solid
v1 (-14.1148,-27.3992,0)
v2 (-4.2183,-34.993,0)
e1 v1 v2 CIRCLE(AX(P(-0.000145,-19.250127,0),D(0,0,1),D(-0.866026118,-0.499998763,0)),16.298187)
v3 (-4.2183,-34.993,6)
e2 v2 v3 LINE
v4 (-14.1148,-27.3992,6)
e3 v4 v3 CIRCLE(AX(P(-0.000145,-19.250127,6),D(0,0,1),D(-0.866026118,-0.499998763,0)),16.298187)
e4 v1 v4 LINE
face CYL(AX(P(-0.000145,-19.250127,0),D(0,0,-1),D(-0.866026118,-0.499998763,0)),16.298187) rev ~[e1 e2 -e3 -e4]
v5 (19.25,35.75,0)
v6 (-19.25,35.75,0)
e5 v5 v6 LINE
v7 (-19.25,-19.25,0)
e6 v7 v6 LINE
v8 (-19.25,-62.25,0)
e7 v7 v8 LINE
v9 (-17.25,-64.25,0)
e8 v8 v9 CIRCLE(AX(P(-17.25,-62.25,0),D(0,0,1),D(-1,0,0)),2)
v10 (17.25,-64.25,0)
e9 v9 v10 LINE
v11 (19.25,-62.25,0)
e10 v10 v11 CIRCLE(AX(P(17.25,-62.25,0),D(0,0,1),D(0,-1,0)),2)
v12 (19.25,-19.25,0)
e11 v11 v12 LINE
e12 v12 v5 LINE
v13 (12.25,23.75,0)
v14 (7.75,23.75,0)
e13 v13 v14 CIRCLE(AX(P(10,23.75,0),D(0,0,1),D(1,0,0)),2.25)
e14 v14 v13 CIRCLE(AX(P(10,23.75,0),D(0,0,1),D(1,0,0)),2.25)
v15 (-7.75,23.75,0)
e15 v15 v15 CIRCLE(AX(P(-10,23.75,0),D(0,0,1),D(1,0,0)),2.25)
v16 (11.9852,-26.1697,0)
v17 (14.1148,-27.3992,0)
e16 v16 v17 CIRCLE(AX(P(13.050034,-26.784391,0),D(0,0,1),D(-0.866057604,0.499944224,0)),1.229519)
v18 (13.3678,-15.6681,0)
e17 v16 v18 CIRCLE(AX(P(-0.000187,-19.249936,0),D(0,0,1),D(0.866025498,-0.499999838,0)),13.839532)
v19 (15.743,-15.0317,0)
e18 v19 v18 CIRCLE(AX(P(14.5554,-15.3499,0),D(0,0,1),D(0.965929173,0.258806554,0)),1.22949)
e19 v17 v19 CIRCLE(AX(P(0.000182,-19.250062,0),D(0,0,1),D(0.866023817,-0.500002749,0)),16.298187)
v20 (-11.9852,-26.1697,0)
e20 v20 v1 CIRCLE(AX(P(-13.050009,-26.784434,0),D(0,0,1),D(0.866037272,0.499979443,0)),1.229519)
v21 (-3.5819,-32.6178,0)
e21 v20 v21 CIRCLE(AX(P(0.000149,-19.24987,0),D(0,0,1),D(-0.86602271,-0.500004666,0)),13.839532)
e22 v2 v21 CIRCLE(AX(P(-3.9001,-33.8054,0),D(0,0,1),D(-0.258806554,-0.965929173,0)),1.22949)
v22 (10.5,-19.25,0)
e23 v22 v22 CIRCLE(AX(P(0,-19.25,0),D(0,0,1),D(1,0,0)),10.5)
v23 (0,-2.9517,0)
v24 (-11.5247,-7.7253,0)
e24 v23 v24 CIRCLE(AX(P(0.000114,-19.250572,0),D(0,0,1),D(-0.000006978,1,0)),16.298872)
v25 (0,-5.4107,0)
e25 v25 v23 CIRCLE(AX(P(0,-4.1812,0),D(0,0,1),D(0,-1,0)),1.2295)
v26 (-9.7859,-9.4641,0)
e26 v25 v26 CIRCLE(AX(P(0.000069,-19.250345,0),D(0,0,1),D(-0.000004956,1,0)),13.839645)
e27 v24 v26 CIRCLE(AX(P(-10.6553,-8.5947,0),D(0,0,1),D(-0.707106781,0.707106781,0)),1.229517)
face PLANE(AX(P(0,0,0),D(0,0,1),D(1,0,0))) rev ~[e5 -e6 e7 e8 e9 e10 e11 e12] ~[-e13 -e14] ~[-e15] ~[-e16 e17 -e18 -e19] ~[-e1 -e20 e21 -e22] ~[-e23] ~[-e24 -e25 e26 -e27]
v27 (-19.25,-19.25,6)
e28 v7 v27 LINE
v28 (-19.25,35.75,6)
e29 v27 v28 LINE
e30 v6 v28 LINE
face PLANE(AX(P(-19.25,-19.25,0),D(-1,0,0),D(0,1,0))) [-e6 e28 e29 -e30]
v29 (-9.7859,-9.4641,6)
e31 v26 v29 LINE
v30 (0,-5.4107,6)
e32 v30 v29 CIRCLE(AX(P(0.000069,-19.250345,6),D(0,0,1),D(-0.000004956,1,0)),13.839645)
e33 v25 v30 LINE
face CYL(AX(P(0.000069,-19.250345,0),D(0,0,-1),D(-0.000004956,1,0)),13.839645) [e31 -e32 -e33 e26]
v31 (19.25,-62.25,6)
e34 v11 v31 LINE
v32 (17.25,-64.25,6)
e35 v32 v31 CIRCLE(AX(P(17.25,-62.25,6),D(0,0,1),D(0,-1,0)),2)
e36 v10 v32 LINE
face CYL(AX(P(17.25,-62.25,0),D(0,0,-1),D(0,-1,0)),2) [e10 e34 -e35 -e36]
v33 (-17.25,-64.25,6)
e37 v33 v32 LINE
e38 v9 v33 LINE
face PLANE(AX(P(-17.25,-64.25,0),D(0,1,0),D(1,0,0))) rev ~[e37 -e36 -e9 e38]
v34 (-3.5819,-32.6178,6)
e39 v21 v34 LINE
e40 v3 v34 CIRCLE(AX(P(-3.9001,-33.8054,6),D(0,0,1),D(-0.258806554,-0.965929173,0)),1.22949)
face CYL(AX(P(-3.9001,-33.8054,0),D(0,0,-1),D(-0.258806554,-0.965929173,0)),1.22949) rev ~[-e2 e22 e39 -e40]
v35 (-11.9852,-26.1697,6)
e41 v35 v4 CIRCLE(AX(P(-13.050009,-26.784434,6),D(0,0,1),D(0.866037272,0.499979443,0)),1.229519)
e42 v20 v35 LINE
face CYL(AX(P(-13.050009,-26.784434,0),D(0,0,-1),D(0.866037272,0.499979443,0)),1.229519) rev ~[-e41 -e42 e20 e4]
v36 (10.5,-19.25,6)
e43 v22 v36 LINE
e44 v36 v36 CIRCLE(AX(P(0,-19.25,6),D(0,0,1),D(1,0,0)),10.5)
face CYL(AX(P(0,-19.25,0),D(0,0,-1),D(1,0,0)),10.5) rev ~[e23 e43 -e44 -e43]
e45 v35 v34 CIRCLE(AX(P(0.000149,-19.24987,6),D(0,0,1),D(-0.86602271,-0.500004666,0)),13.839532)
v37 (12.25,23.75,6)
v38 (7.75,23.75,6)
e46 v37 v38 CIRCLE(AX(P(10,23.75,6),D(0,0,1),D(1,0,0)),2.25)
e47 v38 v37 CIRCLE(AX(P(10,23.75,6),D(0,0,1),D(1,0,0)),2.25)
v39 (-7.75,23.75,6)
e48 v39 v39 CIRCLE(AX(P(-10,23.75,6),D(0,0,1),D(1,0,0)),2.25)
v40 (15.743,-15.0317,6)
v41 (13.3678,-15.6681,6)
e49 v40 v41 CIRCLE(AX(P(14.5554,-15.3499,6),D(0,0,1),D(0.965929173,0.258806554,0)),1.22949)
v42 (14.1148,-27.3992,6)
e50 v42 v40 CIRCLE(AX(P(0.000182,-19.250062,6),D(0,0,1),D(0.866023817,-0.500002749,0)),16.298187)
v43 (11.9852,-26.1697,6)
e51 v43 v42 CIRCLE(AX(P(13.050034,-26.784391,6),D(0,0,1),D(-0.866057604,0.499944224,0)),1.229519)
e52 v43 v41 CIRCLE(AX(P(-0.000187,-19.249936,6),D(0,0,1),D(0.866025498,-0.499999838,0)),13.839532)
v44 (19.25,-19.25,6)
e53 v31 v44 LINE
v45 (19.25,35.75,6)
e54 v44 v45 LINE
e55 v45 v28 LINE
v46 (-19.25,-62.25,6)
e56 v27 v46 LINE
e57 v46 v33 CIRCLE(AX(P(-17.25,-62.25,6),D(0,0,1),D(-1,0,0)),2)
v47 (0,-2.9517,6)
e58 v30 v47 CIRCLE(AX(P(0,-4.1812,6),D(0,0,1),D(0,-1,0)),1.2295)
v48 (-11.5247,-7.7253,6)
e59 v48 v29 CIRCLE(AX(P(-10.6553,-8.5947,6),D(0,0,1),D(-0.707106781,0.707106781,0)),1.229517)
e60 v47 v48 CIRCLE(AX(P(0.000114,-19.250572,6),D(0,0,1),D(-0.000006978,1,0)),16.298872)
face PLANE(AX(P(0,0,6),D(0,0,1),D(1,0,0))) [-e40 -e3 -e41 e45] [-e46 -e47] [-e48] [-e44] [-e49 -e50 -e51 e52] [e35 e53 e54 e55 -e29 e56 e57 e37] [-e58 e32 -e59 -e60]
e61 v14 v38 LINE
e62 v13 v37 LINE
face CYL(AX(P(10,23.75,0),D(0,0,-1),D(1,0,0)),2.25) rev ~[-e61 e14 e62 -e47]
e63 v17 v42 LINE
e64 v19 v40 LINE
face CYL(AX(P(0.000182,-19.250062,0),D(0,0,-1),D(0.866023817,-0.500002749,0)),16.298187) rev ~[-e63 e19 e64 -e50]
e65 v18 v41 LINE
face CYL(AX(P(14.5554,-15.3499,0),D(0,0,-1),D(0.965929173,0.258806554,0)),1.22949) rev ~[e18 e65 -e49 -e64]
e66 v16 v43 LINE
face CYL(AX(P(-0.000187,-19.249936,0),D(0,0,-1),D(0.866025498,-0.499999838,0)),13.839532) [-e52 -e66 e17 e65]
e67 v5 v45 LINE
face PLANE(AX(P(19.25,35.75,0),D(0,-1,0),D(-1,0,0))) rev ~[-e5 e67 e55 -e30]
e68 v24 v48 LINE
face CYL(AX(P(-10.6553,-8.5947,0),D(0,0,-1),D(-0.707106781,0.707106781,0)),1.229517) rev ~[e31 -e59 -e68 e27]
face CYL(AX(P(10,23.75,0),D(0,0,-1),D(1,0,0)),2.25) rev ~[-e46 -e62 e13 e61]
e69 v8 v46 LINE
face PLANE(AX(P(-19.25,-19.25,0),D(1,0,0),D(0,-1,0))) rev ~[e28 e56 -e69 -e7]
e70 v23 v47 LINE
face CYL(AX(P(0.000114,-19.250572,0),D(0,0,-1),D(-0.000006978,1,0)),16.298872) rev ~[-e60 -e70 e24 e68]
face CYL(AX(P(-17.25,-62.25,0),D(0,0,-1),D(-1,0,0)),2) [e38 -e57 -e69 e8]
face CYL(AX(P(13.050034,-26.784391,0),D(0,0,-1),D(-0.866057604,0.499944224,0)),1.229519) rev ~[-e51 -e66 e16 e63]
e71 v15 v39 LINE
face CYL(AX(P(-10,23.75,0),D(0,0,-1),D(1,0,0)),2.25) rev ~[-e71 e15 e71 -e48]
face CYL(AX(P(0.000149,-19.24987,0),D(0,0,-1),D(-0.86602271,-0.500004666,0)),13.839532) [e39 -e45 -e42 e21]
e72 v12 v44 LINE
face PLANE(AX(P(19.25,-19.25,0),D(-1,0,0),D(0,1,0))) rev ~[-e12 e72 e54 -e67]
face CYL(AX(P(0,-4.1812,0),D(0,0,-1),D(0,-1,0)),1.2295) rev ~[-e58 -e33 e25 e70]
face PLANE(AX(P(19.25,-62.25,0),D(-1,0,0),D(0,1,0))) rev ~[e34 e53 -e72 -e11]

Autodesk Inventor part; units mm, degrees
ref_plane "YZ Plane" through (0, 0, 0) normal (1, 0, 0) x (0, 1, 0)
ref_plane "XZ Plane" through (0, 0, 0) normal (0, 1, 0) x (-1, 0, 0)
ref_plane "XY Plane" through (0, 0, 0) normal (0, 0, 1) x (1, 0, 0)
sketch "Sketch1" plane through (0, 0, 0) normal (0, 0, 1) x (1, 0, 0)
  circle A0 centre (0, -19.25) radius 10.5
  arc A1 (11.9852, -26.1697) -> (14.1148, -27.3992) centre (13.05, -26.7844) ccw
  arc A2 (-11.9852, -26.1697) -> (-14.1148, -27.3992) centre (-13.05, -26.7844) ccw
  arc A3 (0, -5.4107) -> (0, -2.9517) centre (0, -4.1812) ccw
  line L0 (0, -19.25) -> (14.5554, -15.3499) construction
  line L1 (0, -19.25) -> (13.05, -26.7844) construction
  line L2 (0, -19.25) -> (-10.6553, -8.5947) construction
  line L3 (0, -19.25) -> (0, -4.1812) construction
  line L4 (0, -19.25) -> (-3.9001, -33.8054) construction
  line L5 (0, -19.25) -> (-13.05, -26.7844) construction
  arc A4 (-4.2183, -34.993) -> (-3.5819, -32.6178) centre (-3.9001, -33.8054) ccw
  arc A5 (15.743, -15.0317) -> (13.3678, -15.6681) centre (14.5554, -15.3499) ccw
  arc A6 (-11.5247, -7.7253) -> (-9.7859, -9.4641) centre (-10.6553, -8.5947) ccw
  arc A7 (0, -2.9517) -> (-11.5247, -7.7253) centre (0, -19.25) ccw
  arc A8 (0, -5.4107) -> (-9.7859, -9.4641) centre (0, -19.25) ccw
  arc A9 (11.9852, -26.1697) -> (13.3678, -15.6681) centre (0, -19.25) ccw
  arc A10 (14.1148, -27.3992) -> (15.743, -15.0317) centre (0, -19.25) ccw
  arc A11 (-11.9852, -26.1697) -> (-3.5819, -32.6178) centre (0, -19.25) ccw
  arc A12 (-14.1148, -27.3992) -> (-4.2183, -34.993) centre (0, -19.25) ccw
  line L6 (19.25, -19.25) -> (19.25, 35.75)
  line L7 (-19.25, -19.25) -> (-19.25, 35.75)
  line L8 (19.25, 35.75) -> (-19.25, 35.75)
  circle A13 centre (-10, 23.75) radius 2.25
  circle A14 centre (10, 23.75) radius 2.25
  line L9 (10, 23.75) -> (-10, 23.75)
  line L10 (-19.25, -19.25) -> (-19.25, -62.25)
  line L11 (-17.25, -64.25) -> (17.25, -64.25)
  line L12 (19.25, -62.25) -> (19.25, -19.25)
  arc A15 (-19.25, -62.25) -> (-17.25, -64.25) centre (-17.25, -62.25) ccw
  arc A16 (17.25, -64.25) -> (19.25, -62.25) centre (17.25, -62.25) ccw
  point P0 (0, 0)
  point P1 (19.25, 30.75)
  point P2 (-19.25, -64.25)
  dimension "d0" = 21
  dimension "d1" = 45
  dimension "d2" = 45
  dimension "d3" = 45
  dimension "d4" = 2.459
  dimension "d5" = 2.459
  dimension "d6" = 2.459
  dimension "d7" = 2.459
  dimension "d8" = 2.459
  dimension "d9" = 2.459
  dimension "d11" = 55
  dimension "d21" = 4.5
  dimension "d22" = 12
  dimension "d23" = 4.5
  dimension "d24" = 20
  dimension "d25" = 9.25
  dimension "d26" = 38.5
  dimension "d27" = 45
  dimension "d28" = 2
extrude "Extrusion1" add sketch "Sketch1" along normal blind 6
equation "\"d8\" = d6"
equation "\"d9\" = d7"
equation "\"d23\" = d21"
equation "\"d25\" = -0.5 * d24 + 0.5 * d26"
properties part number "BaseC_7" material "PMMA Plastic"
